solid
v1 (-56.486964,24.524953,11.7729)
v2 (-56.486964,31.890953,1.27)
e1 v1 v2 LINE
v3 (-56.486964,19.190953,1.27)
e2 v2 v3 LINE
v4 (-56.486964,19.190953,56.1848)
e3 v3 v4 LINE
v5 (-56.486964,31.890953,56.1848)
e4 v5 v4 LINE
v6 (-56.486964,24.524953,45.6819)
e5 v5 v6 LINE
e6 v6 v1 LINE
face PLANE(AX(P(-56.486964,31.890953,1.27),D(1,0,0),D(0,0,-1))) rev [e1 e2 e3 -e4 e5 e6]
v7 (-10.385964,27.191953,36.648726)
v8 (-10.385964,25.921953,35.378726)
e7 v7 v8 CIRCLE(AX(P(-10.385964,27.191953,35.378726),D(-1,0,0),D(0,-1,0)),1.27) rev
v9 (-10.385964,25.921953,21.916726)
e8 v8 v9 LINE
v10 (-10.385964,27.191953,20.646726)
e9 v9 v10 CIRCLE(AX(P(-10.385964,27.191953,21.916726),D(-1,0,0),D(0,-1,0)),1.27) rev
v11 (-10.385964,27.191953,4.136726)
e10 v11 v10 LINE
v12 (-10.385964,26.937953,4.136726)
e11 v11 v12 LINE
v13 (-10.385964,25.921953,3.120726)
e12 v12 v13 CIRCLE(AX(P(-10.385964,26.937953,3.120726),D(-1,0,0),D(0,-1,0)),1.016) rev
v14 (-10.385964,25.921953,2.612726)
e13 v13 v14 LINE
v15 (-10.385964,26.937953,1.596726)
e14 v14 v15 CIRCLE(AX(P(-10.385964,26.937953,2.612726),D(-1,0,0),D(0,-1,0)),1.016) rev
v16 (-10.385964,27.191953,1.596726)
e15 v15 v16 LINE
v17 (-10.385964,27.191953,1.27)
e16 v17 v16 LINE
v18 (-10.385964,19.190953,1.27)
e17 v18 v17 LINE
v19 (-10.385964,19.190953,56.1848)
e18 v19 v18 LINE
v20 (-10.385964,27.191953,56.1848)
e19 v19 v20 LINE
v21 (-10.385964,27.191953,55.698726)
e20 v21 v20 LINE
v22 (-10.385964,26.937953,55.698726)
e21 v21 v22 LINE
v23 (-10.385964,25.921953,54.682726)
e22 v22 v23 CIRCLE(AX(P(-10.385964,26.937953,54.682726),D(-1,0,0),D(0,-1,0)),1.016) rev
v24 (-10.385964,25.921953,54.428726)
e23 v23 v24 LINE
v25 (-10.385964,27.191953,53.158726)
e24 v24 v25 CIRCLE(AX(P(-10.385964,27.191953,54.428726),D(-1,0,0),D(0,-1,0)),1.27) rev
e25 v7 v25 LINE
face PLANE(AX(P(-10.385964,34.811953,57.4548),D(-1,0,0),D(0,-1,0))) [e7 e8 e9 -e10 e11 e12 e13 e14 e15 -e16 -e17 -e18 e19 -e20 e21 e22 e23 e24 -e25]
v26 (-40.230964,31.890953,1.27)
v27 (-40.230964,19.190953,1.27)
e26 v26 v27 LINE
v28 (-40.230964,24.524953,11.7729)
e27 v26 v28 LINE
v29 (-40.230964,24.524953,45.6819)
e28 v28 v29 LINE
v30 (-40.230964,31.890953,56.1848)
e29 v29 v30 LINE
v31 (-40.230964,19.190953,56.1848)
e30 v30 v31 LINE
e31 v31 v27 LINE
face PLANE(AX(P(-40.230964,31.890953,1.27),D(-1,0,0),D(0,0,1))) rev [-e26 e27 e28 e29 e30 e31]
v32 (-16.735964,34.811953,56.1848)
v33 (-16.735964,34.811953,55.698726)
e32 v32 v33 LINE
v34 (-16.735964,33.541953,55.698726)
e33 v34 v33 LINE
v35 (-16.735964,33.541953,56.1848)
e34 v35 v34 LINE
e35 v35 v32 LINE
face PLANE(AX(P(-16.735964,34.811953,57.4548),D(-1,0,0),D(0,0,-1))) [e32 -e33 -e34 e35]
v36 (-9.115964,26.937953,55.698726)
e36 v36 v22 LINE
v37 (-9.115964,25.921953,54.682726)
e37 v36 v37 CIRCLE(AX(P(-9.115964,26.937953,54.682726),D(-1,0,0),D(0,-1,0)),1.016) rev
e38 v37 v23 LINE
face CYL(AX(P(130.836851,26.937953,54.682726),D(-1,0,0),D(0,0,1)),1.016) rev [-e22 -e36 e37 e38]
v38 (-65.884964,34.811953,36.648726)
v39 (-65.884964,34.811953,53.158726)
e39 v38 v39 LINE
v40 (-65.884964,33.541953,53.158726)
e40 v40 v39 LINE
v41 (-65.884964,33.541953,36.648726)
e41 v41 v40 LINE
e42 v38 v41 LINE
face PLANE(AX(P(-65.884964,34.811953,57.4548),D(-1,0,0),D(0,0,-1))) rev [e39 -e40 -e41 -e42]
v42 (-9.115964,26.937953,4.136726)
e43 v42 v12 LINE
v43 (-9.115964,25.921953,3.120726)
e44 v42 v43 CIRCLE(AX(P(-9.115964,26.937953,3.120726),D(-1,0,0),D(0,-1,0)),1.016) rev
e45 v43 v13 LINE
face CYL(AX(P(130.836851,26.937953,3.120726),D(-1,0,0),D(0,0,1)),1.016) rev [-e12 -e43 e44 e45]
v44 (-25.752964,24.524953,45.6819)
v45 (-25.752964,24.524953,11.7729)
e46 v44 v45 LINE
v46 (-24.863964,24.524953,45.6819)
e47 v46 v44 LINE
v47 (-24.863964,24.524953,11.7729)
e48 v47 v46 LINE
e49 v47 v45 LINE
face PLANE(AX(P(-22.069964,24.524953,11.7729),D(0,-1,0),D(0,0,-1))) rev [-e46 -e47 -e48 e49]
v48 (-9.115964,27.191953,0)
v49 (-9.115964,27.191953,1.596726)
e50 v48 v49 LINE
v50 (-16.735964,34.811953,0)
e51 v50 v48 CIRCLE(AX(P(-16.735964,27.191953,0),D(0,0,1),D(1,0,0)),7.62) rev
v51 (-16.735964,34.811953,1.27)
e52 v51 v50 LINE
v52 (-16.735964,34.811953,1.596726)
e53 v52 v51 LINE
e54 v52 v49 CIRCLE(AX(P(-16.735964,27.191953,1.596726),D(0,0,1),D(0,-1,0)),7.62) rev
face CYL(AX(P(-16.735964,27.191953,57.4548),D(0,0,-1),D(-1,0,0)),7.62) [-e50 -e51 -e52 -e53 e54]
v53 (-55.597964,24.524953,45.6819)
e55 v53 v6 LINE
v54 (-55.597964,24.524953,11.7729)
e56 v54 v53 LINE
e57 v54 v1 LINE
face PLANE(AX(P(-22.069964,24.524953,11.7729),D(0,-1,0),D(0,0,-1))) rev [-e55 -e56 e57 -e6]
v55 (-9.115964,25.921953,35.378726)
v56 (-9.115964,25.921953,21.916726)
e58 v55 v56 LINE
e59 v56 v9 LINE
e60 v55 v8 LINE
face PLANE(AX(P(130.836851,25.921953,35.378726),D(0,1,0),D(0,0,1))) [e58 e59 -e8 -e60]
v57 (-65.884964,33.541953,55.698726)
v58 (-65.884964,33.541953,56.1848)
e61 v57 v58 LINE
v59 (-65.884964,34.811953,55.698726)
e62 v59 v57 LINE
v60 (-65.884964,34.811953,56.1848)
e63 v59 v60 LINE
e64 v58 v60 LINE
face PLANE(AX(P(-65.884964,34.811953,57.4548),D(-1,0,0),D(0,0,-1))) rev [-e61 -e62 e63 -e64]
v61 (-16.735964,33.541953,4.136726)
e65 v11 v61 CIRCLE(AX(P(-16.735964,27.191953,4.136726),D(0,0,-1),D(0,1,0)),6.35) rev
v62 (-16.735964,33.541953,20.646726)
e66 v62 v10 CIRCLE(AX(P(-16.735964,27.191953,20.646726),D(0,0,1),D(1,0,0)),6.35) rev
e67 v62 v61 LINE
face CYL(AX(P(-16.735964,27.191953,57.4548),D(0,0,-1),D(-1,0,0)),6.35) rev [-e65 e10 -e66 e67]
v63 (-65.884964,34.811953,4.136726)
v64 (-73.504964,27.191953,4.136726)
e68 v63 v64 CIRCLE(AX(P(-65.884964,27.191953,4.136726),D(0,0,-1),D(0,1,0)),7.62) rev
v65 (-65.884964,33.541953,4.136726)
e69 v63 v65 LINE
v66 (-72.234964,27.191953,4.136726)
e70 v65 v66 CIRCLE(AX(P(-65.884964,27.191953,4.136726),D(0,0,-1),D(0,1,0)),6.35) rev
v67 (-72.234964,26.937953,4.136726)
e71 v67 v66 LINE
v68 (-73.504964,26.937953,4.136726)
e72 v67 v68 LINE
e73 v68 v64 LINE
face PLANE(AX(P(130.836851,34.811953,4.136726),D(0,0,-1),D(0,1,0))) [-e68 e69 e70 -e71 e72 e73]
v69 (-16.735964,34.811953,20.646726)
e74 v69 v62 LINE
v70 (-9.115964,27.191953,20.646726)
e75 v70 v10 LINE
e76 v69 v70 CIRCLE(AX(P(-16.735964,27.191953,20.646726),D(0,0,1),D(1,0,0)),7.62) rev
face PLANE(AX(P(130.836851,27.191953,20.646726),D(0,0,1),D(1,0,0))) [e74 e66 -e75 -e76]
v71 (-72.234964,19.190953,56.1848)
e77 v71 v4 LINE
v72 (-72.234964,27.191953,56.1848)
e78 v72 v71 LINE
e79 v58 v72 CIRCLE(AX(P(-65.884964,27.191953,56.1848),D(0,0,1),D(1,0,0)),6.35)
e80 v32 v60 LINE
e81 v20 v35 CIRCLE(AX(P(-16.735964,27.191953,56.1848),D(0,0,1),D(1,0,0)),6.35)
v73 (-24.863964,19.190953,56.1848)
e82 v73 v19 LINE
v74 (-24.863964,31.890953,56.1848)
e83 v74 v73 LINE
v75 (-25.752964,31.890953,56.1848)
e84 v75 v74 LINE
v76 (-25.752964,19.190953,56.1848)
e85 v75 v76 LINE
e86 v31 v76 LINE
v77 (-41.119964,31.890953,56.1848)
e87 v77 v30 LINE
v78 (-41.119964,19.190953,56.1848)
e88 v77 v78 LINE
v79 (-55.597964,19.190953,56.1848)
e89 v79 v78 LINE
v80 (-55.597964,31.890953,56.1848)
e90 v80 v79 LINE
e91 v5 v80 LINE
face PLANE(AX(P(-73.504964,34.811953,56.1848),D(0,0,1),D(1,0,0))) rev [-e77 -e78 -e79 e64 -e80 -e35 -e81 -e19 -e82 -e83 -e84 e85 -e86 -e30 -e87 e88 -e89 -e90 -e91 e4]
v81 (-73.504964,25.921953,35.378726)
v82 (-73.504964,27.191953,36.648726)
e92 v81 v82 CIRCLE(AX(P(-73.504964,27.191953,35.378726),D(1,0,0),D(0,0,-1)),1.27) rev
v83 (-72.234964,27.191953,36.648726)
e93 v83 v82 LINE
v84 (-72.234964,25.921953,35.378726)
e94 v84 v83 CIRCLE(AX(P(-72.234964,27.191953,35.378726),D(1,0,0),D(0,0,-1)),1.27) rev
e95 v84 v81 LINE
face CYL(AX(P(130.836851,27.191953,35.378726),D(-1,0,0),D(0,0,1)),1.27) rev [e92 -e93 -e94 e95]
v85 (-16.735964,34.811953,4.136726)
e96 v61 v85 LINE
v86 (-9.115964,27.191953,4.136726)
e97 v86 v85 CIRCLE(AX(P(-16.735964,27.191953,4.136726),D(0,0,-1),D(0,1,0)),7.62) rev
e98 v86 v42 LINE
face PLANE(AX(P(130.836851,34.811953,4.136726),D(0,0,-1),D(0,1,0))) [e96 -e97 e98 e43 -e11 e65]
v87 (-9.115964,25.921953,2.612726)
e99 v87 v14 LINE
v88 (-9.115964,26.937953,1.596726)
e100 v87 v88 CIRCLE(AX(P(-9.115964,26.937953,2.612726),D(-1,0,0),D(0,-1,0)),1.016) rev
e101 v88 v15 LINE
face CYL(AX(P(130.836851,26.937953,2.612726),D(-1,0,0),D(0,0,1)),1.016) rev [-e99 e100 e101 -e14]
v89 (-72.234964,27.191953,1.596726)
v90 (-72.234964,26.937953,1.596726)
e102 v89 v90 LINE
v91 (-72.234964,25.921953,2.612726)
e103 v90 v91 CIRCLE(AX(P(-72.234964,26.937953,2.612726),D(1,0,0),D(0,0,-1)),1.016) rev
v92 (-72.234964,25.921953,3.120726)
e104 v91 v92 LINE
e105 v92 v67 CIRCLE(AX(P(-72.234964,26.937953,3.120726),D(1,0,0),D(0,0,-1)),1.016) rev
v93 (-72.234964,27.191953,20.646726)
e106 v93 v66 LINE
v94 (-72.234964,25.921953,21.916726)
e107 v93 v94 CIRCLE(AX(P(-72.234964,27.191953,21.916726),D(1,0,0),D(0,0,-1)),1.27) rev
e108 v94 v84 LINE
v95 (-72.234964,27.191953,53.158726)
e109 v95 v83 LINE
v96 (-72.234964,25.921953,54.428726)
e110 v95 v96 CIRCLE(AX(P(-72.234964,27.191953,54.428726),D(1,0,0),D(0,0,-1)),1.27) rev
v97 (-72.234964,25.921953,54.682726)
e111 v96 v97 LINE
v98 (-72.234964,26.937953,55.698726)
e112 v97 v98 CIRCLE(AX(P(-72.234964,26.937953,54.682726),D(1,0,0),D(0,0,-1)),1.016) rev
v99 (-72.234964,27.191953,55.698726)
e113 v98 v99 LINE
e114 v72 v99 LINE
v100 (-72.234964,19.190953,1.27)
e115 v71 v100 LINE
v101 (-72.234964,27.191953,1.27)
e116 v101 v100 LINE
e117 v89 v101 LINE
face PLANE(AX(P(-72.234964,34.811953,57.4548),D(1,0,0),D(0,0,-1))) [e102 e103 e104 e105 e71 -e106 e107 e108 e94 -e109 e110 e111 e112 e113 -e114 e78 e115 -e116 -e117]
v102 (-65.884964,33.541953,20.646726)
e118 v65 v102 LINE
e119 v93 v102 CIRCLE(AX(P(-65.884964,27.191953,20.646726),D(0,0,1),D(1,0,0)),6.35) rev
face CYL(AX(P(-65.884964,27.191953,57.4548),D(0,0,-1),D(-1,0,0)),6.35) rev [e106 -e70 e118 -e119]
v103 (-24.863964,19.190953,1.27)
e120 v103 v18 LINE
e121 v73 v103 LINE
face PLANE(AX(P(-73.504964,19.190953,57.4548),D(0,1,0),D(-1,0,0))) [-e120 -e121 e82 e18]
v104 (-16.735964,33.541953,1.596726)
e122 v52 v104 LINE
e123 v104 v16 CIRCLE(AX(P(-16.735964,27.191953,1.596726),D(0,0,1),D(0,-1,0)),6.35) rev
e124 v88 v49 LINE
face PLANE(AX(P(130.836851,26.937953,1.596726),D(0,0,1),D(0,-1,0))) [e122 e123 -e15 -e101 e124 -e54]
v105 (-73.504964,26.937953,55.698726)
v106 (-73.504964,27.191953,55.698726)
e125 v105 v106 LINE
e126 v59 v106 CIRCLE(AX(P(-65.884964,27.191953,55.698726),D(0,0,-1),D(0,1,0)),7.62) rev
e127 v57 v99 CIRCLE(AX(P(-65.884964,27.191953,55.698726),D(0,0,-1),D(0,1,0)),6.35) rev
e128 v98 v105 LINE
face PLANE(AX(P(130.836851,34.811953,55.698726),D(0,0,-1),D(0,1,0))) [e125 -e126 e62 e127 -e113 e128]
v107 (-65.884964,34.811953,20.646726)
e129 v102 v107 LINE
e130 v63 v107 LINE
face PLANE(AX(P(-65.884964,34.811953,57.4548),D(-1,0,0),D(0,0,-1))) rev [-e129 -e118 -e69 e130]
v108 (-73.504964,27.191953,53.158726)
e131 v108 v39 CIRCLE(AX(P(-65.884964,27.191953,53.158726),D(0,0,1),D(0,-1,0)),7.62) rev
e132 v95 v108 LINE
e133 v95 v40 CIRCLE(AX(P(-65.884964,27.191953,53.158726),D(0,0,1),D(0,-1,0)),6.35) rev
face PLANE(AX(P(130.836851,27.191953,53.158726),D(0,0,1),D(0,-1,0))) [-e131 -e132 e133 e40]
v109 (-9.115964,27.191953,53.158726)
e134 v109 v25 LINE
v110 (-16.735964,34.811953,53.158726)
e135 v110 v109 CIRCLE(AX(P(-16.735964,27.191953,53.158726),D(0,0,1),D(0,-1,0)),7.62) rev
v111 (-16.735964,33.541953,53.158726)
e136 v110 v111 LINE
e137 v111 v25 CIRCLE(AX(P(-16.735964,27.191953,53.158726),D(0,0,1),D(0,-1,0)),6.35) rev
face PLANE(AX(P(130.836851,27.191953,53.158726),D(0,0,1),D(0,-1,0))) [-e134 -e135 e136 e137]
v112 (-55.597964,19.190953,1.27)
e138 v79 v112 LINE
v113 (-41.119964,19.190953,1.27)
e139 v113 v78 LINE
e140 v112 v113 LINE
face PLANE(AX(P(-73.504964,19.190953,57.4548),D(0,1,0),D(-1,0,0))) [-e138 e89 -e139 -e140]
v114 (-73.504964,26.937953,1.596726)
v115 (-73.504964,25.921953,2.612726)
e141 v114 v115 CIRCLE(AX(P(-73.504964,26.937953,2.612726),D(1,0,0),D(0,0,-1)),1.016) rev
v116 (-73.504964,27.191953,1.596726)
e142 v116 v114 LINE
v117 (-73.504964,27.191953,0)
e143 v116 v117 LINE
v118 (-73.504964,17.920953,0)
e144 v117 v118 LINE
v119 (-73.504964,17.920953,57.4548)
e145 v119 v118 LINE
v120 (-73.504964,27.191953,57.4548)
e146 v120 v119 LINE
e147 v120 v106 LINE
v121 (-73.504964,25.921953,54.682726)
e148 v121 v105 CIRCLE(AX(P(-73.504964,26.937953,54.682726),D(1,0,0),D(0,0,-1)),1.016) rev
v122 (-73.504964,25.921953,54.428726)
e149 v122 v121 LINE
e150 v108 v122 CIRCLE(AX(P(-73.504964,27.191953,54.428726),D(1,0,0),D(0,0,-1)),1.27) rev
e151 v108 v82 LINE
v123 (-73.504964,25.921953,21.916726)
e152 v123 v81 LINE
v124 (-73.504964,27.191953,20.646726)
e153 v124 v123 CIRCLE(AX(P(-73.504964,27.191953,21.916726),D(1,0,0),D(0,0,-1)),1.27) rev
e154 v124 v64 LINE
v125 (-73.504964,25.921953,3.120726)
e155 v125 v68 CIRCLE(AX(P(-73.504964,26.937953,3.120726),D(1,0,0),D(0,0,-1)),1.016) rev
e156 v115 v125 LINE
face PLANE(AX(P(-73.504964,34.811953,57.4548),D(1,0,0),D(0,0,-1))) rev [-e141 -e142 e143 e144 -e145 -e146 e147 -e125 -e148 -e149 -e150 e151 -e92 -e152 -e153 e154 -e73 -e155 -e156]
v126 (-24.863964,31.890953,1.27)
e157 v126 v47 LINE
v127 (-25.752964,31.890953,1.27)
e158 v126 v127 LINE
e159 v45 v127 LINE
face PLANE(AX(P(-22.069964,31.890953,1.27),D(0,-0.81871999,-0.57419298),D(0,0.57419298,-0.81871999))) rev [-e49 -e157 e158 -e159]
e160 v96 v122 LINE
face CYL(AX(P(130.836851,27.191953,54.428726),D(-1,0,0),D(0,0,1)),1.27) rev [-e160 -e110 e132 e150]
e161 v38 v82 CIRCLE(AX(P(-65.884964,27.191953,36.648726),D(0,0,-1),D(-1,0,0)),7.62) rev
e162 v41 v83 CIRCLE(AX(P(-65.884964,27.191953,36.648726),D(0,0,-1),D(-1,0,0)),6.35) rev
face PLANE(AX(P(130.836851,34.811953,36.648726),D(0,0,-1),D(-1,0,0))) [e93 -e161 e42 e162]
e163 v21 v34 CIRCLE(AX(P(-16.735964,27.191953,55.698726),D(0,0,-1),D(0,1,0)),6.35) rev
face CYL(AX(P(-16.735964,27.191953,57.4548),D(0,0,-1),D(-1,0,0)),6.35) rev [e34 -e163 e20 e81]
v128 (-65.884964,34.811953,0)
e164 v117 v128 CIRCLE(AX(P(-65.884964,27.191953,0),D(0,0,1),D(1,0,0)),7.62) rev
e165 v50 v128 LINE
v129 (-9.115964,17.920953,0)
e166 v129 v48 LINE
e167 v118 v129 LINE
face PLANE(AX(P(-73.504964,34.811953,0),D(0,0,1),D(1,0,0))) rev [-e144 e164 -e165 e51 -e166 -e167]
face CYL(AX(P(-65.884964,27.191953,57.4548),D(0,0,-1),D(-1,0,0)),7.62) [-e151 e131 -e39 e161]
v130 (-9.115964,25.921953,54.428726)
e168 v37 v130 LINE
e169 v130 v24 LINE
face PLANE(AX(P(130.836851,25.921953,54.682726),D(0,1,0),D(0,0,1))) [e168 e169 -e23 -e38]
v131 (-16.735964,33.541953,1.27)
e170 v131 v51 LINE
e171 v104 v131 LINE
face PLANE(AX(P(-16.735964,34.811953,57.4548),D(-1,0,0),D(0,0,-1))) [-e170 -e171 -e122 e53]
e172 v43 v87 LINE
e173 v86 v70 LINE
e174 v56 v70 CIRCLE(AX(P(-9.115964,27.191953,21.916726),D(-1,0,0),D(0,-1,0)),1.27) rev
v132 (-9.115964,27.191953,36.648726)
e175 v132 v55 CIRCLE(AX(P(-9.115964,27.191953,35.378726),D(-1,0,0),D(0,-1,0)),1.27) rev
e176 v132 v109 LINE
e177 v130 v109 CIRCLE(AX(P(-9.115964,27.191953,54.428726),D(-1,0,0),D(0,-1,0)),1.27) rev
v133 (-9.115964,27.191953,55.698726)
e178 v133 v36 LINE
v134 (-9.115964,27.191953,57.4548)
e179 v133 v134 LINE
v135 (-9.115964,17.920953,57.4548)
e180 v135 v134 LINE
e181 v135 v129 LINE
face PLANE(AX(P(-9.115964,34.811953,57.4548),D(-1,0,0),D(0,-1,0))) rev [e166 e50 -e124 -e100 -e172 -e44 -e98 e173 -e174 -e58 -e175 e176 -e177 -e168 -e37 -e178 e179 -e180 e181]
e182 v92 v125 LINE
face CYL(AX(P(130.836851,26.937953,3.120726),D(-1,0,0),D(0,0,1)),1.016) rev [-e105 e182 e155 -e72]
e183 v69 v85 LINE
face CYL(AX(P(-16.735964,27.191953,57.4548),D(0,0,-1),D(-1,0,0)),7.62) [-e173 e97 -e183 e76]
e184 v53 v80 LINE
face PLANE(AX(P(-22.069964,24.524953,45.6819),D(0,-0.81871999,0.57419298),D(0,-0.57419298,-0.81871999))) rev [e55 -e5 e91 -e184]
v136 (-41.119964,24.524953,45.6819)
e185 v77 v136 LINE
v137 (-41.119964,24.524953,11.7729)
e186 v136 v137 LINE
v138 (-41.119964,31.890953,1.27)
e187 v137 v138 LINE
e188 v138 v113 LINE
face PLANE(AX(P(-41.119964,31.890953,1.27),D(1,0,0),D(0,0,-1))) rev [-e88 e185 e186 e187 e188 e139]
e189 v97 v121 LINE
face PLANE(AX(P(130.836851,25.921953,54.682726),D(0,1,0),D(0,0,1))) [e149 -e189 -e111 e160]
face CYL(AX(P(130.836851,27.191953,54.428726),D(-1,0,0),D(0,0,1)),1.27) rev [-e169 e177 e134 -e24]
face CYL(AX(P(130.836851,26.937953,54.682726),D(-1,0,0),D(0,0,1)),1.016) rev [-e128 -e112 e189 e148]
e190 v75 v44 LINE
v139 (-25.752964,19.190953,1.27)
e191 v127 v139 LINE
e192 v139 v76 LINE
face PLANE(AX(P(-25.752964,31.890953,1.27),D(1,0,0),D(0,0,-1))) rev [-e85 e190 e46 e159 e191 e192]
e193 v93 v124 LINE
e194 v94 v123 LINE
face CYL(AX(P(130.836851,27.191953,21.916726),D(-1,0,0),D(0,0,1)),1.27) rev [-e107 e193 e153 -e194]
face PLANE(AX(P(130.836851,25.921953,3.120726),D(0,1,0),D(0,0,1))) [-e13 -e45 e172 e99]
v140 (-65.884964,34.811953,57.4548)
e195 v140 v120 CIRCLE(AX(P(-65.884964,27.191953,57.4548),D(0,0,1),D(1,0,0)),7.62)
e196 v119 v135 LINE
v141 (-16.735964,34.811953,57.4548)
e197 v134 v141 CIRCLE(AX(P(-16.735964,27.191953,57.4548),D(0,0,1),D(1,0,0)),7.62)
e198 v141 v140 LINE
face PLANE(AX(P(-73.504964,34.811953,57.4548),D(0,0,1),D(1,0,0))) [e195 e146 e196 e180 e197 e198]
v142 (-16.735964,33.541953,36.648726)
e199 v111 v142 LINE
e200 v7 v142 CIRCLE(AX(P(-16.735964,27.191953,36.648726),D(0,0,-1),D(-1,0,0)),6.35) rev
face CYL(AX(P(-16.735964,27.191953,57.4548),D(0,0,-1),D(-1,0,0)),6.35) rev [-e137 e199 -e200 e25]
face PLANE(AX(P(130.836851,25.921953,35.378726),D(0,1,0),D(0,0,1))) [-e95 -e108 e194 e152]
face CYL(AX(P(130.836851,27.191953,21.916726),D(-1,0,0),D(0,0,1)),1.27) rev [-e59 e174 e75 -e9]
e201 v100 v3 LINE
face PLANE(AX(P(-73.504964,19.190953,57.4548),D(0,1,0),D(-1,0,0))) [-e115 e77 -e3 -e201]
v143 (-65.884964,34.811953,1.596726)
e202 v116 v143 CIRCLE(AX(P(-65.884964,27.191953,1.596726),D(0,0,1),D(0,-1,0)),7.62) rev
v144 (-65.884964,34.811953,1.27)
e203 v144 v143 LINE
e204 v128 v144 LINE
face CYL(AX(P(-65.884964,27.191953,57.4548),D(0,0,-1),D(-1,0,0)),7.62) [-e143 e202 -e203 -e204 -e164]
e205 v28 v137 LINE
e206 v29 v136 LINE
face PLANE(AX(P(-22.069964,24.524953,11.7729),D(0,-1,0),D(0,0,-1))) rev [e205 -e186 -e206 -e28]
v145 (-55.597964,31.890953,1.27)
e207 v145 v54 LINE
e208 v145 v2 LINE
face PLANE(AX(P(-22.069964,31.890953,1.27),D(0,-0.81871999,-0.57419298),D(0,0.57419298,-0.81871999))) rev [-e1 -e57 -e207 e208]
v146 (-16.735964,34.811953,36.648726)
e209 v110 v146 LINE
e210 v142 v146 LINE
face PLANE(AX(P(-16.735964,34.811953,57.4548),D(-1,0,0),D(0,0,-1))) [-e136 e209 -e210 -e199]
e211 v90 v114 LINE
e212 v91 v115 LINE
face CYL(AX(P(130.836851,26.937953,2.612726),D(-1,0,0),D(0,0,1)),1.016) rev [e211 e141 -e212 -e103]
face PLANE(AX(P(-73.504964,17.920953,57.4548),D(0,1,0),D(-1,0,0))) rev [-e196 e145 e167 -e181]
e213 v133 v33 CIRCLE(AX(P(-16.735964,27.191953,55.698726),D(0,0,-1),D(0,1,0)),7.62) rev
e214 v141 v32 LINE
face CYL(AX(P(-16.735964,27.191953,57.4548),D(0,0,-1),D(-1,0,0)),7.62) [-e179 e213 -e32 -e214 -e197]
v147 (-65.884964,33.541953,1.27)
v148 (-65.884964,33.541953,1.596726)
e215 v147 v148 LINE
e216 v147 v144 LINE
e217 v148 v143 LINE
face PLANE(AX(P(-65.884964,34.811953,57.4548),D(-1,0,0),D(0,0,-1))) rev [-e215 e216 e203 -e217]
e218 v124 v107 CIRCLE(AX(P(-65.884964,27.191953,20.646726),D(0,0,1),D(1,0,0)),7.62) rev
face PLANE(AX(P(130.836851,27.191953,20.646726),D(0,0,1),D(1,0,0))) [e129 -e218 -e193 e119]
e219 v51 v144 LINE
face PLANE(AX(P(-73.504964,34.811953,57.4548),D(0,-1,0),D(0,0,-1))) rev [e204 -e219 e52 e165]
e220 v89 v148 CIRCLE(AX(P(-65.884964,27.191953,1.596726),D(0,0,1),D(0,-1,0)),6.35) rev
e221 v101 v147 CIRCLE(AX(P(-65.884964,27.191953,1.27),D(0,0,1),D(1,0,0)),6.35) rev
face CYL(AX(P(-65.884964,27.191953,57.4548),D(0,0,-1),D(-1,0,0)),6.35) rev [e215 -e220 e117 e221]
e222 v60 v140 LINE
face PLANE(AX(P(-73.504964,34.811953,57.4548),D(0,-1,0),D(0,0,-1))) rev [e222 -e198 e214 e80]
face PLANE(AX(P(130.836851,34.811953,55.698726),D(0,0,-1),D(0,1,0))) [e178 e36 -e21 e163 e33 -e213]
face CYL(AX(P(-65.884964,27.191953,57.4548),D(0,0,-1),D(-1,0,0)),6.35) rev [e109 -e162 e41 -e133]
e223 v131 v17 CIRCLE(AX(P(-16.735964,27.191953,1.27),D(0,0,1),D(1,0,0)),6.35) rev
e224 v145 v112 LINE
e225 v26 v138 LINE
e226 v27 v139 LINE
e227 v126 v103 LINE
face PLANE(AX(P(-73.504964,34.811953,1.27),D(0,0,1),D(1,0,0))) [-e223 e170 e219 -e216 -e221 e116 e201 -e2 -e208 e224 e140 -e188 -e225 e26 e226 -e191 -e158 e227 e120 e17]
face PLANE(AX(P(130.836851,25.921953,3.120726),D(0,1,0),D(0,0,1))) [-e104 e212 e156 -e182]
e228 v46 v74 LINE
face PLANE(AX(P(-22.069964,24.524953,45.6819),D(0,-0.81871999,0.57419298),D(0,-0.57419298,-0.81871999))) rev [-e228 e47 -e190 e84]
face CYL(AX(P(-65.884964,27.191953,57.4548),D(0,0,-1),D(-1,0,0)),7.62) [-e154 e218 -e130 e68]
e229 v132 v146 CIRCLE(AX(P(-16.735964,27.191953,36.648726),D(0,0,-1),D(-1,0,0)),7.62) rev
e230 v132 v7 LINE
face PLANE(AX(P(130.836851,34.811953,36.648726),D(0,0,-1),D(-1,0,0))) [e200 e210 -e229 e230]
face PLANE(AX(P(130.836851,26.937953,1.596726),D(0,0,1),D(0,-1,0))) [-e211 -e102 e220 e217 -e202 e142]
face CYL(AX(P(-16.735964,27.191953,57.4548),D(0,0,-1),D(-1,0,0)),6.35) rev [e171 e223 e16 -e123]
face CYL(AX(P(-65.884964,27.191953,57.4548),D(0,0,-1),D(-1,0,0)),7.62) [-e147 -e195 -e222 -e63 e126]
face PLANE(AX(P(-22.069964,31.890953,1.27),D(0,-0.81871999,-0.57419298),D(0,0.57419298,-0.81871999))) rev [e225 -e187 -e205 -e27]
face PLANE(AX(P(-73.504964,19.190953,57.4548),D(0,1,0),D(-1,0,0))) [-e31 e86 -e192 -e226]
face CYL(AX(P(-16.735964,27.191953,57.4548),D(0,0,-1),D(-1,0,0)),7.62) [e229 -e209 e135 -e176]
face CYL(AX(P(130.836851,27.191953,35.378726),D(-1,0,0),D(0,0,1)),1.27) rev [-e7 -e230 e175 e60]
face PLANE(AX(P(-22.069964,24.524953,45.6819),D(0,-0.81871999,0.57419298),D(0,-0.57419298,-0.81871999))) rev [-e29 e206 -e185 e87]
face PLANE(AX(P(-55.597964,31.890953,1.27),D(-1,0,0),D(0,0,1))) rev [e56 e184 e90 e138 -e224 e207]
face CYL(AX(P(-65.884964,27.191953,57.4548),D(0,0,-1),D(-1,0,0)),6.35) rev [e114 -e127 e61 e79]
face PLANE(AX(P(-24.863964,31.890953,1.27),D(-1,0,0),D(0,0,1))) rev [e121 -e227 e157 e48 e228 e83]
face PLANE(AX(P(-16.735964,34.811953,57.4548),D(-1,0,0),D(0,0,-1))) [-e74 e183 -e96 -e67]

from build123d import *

# Parameters (mm, degrees)
SKETCH1_W               = 64.389
SKETCH1_H               = 16.891
EXTRUDE1_DEPTH          = 57.4548
FILLET2_R               = 7.62
SHELL1_START            = 1.27
SHELL1_DEPTH            = 54.9148
CUT_EXTRUDE1_DEPTH      = 100.578641885
CUT_EXTRUDE1_DEPTH_BACK = 100.578641885
SKETCH4_W               = 0.889
SKETCH4_H               = 54.9148
EXTRUDE2_DEPTH          = 12.7
CUT_EXTRUDE2_DEPTH      = 20.32
CUT_EXTRUDE2_DEPTH_BACK = 19.05


# Read off the part's stored shape, not the designer's step: Shell1
with BuildPart() as part:
    # Sketch1 → Extrude1 (new body)
    with BuildSketch(Plane.XY):
        with Locations((-41.310464395, 26.366453204)):
            Rectangle(SKETCH1_W, SKETCH1_H)
    extrude(amount=EXTRUDE1_DEPTH)

    # Fillet2
    fillet2_edges = [part.edges().sort_by_distance(p)[0] for p in [
        (-73.504964395, 34.811953204, 28.7274),
        (-9.115964395, 34.811953204, 28.7274),
    ]]
    fillet(fillet2_edges, radius=FILLET2_R)

    # Shell1 outline → Shell1 (cut)
    with BuildSketch(Plane.XY.offset(SHELL1_START)):
        with BuildLine():
            Line((-16.735964395, 33.541953204), (-16.735964395, 34.811953204))
            Line((-16.735964395, 34.811953204), (-65.884964395, 34.811953204))
            Line((-65.884964395, 34.811953204), (-65.884964395, 33.541953204))
            ThreePointArc((-65.884964395, 33.541953204), (-70.375092455, 31.682081264), (-72.234964395, 27.191953204))
            Line((-72.234964395, 27.191953204), (-72.234964395, 19.190953204))
            Line((-72.234964395, 19.190953204), (-10.385964395, 19.190953204))
            Line((-10.385964395, 19.190953204), (-10.385964395, 27.191953204))
            ThreePointArc((-10.385964395, 27.191953204), (-12.245836334, 31.682081265), (-16.735964395, 33.541953204))
        make_face()
    extrude(amount=SHELL1_DEPTH, mode=Mode.SUBTRACT)

    # Sketch2 → Cut-Extrude1 (cut, two sides: drawn at the far end of the back side and taken through both)
    with BuildSketch(Plane(origin=(0, 0, 0), x_dir=(0, 0, -1), z_dir=(1, 0, 0)).offset(-CUT_EXTRUDE1_DEPTH_BACK)):
        with BuildLine():
            Line((-189.674707518, 34.811953204), (-58.293, 34.811953204))
            Line((-58.293, 34.811953204), (-55.698725793, 34.811953204))
            Line((-55.698725793, 34.811953204), (-55.698725793, 26.937953204))
            ThreePointArc((-55.698725793, 26.937953204), (-55.401146283, 26.219532715), (-54.682725793, 25.921953204))
            Line((-54.682725793, 25.921953204), (-54.428725793, 25.921953204))
            ThreePointArc((-54.428725793, 25.921953204), (-53.530700181, 26.293927592), (-53.158725793, 27.191953204))
            Line((-53.158725793, 27.191953204), (-53.158725793, 34.811953204))
            Line((-53.158725793, 34.811953204), (-36.648725793, 34.811953204))
            Line((-36.648725793, 34.811953204), (-36.648725793, 27.191953204))
            ThreePointArc((-36.648725793, 27.191953204), (-36.276751405, 26.293927592), (-35.378725793, 25.921953204))
            Line((-35.378725793, 25.921953204), (-21.916725793, 25.921953204))
            ThreePointArc((-21.916725793, 25.921953204), (-21.018700181, 26.293927592), (-20.646725793, 27.191953204))
            Line((-20.646725793, 27.191953204), (-20.646725793, 34.811953204))
            Line((-20.646725793, 34.811953204), (-4.136725793, 34.811953204))
            Line((-4.136725793, 34.811953204), (-4.136725793, 26.937953204))
            ThreePointArc((-4.136725793, 26.937953204), (-3.839146283, 26.219532715), (-3.120725793, 25.921953204))
            Line((-3.120725793, 25.921953204), (-2.612725793, 25.921953204))
            ThreePointArc((-2.612725793, 25.921953204), (-1.894305303, 26.219532715), (-1.596725793, 26.937953204))
            Line((-1.596725793, 26.937953204), (-1.596725793, 34.811953204))
            Line((-1.596725793, 34.811953204), (0, 34.811953204))
            Line((0, 34.811953204), (131.381707518, 34.811953204))
            Line((131.381707518, 34.811953204), (131.381707518, 297.575368241))
            Line((131.381707518, 297.575368241), (-189.674707518, 297.575368241))
            Line((-189.674707518, 297.575368241), (-189.674707518, 34.811953204))
        make_face()
    extrude(amount=CUT_EXTRUDE1_DEPTH + CUT_EXTRUDE1_DEPTH_BACK, mode=Mode.SUBTRACT)

    # Sketch4 → Extrude2 (add)
    with BuildSketch(Plane(origin=(0, 19.190953204, 0), x_dir=(-1, 0, 0), z_dir=(0, 1, 0))):
        with Locations((40.675464395, 28.7274)):
            Rectangle(SKETCH4_W, SKETCH4_H)
        with Locations((25.308464395, 28.7274)):
            Rectangle(SKETCH4_W, SKETCH4_H)
        with Locations((56.042464395, 28.7274)):
            Rectangle(SKETCH4_W, SKETCH4_H)
    extrude(amount=EXTRUDE2_DEPTH)

    # Sketch5 → Cut-Extrude2 (cut, two sides: drawn at the far end of the back side and taken through both)
    with BuildSketch(Plane.ZY.offset(41.119964395).offset(-CUT_EXTRUDE2_DEPTH_BACK)):
        Polygon((1.27, 31.890953204), (11.7729, 24.524953204), (45.6819, 24.524953204), (56.1848, 31.890953204), align=None)
    extrude(amount=CUT_EXTRUDE2_DEPTH + CUT_EXTRUDE2_DEPTH_BACK, mode=Mode.SUBTRACT)


solid = part.part
